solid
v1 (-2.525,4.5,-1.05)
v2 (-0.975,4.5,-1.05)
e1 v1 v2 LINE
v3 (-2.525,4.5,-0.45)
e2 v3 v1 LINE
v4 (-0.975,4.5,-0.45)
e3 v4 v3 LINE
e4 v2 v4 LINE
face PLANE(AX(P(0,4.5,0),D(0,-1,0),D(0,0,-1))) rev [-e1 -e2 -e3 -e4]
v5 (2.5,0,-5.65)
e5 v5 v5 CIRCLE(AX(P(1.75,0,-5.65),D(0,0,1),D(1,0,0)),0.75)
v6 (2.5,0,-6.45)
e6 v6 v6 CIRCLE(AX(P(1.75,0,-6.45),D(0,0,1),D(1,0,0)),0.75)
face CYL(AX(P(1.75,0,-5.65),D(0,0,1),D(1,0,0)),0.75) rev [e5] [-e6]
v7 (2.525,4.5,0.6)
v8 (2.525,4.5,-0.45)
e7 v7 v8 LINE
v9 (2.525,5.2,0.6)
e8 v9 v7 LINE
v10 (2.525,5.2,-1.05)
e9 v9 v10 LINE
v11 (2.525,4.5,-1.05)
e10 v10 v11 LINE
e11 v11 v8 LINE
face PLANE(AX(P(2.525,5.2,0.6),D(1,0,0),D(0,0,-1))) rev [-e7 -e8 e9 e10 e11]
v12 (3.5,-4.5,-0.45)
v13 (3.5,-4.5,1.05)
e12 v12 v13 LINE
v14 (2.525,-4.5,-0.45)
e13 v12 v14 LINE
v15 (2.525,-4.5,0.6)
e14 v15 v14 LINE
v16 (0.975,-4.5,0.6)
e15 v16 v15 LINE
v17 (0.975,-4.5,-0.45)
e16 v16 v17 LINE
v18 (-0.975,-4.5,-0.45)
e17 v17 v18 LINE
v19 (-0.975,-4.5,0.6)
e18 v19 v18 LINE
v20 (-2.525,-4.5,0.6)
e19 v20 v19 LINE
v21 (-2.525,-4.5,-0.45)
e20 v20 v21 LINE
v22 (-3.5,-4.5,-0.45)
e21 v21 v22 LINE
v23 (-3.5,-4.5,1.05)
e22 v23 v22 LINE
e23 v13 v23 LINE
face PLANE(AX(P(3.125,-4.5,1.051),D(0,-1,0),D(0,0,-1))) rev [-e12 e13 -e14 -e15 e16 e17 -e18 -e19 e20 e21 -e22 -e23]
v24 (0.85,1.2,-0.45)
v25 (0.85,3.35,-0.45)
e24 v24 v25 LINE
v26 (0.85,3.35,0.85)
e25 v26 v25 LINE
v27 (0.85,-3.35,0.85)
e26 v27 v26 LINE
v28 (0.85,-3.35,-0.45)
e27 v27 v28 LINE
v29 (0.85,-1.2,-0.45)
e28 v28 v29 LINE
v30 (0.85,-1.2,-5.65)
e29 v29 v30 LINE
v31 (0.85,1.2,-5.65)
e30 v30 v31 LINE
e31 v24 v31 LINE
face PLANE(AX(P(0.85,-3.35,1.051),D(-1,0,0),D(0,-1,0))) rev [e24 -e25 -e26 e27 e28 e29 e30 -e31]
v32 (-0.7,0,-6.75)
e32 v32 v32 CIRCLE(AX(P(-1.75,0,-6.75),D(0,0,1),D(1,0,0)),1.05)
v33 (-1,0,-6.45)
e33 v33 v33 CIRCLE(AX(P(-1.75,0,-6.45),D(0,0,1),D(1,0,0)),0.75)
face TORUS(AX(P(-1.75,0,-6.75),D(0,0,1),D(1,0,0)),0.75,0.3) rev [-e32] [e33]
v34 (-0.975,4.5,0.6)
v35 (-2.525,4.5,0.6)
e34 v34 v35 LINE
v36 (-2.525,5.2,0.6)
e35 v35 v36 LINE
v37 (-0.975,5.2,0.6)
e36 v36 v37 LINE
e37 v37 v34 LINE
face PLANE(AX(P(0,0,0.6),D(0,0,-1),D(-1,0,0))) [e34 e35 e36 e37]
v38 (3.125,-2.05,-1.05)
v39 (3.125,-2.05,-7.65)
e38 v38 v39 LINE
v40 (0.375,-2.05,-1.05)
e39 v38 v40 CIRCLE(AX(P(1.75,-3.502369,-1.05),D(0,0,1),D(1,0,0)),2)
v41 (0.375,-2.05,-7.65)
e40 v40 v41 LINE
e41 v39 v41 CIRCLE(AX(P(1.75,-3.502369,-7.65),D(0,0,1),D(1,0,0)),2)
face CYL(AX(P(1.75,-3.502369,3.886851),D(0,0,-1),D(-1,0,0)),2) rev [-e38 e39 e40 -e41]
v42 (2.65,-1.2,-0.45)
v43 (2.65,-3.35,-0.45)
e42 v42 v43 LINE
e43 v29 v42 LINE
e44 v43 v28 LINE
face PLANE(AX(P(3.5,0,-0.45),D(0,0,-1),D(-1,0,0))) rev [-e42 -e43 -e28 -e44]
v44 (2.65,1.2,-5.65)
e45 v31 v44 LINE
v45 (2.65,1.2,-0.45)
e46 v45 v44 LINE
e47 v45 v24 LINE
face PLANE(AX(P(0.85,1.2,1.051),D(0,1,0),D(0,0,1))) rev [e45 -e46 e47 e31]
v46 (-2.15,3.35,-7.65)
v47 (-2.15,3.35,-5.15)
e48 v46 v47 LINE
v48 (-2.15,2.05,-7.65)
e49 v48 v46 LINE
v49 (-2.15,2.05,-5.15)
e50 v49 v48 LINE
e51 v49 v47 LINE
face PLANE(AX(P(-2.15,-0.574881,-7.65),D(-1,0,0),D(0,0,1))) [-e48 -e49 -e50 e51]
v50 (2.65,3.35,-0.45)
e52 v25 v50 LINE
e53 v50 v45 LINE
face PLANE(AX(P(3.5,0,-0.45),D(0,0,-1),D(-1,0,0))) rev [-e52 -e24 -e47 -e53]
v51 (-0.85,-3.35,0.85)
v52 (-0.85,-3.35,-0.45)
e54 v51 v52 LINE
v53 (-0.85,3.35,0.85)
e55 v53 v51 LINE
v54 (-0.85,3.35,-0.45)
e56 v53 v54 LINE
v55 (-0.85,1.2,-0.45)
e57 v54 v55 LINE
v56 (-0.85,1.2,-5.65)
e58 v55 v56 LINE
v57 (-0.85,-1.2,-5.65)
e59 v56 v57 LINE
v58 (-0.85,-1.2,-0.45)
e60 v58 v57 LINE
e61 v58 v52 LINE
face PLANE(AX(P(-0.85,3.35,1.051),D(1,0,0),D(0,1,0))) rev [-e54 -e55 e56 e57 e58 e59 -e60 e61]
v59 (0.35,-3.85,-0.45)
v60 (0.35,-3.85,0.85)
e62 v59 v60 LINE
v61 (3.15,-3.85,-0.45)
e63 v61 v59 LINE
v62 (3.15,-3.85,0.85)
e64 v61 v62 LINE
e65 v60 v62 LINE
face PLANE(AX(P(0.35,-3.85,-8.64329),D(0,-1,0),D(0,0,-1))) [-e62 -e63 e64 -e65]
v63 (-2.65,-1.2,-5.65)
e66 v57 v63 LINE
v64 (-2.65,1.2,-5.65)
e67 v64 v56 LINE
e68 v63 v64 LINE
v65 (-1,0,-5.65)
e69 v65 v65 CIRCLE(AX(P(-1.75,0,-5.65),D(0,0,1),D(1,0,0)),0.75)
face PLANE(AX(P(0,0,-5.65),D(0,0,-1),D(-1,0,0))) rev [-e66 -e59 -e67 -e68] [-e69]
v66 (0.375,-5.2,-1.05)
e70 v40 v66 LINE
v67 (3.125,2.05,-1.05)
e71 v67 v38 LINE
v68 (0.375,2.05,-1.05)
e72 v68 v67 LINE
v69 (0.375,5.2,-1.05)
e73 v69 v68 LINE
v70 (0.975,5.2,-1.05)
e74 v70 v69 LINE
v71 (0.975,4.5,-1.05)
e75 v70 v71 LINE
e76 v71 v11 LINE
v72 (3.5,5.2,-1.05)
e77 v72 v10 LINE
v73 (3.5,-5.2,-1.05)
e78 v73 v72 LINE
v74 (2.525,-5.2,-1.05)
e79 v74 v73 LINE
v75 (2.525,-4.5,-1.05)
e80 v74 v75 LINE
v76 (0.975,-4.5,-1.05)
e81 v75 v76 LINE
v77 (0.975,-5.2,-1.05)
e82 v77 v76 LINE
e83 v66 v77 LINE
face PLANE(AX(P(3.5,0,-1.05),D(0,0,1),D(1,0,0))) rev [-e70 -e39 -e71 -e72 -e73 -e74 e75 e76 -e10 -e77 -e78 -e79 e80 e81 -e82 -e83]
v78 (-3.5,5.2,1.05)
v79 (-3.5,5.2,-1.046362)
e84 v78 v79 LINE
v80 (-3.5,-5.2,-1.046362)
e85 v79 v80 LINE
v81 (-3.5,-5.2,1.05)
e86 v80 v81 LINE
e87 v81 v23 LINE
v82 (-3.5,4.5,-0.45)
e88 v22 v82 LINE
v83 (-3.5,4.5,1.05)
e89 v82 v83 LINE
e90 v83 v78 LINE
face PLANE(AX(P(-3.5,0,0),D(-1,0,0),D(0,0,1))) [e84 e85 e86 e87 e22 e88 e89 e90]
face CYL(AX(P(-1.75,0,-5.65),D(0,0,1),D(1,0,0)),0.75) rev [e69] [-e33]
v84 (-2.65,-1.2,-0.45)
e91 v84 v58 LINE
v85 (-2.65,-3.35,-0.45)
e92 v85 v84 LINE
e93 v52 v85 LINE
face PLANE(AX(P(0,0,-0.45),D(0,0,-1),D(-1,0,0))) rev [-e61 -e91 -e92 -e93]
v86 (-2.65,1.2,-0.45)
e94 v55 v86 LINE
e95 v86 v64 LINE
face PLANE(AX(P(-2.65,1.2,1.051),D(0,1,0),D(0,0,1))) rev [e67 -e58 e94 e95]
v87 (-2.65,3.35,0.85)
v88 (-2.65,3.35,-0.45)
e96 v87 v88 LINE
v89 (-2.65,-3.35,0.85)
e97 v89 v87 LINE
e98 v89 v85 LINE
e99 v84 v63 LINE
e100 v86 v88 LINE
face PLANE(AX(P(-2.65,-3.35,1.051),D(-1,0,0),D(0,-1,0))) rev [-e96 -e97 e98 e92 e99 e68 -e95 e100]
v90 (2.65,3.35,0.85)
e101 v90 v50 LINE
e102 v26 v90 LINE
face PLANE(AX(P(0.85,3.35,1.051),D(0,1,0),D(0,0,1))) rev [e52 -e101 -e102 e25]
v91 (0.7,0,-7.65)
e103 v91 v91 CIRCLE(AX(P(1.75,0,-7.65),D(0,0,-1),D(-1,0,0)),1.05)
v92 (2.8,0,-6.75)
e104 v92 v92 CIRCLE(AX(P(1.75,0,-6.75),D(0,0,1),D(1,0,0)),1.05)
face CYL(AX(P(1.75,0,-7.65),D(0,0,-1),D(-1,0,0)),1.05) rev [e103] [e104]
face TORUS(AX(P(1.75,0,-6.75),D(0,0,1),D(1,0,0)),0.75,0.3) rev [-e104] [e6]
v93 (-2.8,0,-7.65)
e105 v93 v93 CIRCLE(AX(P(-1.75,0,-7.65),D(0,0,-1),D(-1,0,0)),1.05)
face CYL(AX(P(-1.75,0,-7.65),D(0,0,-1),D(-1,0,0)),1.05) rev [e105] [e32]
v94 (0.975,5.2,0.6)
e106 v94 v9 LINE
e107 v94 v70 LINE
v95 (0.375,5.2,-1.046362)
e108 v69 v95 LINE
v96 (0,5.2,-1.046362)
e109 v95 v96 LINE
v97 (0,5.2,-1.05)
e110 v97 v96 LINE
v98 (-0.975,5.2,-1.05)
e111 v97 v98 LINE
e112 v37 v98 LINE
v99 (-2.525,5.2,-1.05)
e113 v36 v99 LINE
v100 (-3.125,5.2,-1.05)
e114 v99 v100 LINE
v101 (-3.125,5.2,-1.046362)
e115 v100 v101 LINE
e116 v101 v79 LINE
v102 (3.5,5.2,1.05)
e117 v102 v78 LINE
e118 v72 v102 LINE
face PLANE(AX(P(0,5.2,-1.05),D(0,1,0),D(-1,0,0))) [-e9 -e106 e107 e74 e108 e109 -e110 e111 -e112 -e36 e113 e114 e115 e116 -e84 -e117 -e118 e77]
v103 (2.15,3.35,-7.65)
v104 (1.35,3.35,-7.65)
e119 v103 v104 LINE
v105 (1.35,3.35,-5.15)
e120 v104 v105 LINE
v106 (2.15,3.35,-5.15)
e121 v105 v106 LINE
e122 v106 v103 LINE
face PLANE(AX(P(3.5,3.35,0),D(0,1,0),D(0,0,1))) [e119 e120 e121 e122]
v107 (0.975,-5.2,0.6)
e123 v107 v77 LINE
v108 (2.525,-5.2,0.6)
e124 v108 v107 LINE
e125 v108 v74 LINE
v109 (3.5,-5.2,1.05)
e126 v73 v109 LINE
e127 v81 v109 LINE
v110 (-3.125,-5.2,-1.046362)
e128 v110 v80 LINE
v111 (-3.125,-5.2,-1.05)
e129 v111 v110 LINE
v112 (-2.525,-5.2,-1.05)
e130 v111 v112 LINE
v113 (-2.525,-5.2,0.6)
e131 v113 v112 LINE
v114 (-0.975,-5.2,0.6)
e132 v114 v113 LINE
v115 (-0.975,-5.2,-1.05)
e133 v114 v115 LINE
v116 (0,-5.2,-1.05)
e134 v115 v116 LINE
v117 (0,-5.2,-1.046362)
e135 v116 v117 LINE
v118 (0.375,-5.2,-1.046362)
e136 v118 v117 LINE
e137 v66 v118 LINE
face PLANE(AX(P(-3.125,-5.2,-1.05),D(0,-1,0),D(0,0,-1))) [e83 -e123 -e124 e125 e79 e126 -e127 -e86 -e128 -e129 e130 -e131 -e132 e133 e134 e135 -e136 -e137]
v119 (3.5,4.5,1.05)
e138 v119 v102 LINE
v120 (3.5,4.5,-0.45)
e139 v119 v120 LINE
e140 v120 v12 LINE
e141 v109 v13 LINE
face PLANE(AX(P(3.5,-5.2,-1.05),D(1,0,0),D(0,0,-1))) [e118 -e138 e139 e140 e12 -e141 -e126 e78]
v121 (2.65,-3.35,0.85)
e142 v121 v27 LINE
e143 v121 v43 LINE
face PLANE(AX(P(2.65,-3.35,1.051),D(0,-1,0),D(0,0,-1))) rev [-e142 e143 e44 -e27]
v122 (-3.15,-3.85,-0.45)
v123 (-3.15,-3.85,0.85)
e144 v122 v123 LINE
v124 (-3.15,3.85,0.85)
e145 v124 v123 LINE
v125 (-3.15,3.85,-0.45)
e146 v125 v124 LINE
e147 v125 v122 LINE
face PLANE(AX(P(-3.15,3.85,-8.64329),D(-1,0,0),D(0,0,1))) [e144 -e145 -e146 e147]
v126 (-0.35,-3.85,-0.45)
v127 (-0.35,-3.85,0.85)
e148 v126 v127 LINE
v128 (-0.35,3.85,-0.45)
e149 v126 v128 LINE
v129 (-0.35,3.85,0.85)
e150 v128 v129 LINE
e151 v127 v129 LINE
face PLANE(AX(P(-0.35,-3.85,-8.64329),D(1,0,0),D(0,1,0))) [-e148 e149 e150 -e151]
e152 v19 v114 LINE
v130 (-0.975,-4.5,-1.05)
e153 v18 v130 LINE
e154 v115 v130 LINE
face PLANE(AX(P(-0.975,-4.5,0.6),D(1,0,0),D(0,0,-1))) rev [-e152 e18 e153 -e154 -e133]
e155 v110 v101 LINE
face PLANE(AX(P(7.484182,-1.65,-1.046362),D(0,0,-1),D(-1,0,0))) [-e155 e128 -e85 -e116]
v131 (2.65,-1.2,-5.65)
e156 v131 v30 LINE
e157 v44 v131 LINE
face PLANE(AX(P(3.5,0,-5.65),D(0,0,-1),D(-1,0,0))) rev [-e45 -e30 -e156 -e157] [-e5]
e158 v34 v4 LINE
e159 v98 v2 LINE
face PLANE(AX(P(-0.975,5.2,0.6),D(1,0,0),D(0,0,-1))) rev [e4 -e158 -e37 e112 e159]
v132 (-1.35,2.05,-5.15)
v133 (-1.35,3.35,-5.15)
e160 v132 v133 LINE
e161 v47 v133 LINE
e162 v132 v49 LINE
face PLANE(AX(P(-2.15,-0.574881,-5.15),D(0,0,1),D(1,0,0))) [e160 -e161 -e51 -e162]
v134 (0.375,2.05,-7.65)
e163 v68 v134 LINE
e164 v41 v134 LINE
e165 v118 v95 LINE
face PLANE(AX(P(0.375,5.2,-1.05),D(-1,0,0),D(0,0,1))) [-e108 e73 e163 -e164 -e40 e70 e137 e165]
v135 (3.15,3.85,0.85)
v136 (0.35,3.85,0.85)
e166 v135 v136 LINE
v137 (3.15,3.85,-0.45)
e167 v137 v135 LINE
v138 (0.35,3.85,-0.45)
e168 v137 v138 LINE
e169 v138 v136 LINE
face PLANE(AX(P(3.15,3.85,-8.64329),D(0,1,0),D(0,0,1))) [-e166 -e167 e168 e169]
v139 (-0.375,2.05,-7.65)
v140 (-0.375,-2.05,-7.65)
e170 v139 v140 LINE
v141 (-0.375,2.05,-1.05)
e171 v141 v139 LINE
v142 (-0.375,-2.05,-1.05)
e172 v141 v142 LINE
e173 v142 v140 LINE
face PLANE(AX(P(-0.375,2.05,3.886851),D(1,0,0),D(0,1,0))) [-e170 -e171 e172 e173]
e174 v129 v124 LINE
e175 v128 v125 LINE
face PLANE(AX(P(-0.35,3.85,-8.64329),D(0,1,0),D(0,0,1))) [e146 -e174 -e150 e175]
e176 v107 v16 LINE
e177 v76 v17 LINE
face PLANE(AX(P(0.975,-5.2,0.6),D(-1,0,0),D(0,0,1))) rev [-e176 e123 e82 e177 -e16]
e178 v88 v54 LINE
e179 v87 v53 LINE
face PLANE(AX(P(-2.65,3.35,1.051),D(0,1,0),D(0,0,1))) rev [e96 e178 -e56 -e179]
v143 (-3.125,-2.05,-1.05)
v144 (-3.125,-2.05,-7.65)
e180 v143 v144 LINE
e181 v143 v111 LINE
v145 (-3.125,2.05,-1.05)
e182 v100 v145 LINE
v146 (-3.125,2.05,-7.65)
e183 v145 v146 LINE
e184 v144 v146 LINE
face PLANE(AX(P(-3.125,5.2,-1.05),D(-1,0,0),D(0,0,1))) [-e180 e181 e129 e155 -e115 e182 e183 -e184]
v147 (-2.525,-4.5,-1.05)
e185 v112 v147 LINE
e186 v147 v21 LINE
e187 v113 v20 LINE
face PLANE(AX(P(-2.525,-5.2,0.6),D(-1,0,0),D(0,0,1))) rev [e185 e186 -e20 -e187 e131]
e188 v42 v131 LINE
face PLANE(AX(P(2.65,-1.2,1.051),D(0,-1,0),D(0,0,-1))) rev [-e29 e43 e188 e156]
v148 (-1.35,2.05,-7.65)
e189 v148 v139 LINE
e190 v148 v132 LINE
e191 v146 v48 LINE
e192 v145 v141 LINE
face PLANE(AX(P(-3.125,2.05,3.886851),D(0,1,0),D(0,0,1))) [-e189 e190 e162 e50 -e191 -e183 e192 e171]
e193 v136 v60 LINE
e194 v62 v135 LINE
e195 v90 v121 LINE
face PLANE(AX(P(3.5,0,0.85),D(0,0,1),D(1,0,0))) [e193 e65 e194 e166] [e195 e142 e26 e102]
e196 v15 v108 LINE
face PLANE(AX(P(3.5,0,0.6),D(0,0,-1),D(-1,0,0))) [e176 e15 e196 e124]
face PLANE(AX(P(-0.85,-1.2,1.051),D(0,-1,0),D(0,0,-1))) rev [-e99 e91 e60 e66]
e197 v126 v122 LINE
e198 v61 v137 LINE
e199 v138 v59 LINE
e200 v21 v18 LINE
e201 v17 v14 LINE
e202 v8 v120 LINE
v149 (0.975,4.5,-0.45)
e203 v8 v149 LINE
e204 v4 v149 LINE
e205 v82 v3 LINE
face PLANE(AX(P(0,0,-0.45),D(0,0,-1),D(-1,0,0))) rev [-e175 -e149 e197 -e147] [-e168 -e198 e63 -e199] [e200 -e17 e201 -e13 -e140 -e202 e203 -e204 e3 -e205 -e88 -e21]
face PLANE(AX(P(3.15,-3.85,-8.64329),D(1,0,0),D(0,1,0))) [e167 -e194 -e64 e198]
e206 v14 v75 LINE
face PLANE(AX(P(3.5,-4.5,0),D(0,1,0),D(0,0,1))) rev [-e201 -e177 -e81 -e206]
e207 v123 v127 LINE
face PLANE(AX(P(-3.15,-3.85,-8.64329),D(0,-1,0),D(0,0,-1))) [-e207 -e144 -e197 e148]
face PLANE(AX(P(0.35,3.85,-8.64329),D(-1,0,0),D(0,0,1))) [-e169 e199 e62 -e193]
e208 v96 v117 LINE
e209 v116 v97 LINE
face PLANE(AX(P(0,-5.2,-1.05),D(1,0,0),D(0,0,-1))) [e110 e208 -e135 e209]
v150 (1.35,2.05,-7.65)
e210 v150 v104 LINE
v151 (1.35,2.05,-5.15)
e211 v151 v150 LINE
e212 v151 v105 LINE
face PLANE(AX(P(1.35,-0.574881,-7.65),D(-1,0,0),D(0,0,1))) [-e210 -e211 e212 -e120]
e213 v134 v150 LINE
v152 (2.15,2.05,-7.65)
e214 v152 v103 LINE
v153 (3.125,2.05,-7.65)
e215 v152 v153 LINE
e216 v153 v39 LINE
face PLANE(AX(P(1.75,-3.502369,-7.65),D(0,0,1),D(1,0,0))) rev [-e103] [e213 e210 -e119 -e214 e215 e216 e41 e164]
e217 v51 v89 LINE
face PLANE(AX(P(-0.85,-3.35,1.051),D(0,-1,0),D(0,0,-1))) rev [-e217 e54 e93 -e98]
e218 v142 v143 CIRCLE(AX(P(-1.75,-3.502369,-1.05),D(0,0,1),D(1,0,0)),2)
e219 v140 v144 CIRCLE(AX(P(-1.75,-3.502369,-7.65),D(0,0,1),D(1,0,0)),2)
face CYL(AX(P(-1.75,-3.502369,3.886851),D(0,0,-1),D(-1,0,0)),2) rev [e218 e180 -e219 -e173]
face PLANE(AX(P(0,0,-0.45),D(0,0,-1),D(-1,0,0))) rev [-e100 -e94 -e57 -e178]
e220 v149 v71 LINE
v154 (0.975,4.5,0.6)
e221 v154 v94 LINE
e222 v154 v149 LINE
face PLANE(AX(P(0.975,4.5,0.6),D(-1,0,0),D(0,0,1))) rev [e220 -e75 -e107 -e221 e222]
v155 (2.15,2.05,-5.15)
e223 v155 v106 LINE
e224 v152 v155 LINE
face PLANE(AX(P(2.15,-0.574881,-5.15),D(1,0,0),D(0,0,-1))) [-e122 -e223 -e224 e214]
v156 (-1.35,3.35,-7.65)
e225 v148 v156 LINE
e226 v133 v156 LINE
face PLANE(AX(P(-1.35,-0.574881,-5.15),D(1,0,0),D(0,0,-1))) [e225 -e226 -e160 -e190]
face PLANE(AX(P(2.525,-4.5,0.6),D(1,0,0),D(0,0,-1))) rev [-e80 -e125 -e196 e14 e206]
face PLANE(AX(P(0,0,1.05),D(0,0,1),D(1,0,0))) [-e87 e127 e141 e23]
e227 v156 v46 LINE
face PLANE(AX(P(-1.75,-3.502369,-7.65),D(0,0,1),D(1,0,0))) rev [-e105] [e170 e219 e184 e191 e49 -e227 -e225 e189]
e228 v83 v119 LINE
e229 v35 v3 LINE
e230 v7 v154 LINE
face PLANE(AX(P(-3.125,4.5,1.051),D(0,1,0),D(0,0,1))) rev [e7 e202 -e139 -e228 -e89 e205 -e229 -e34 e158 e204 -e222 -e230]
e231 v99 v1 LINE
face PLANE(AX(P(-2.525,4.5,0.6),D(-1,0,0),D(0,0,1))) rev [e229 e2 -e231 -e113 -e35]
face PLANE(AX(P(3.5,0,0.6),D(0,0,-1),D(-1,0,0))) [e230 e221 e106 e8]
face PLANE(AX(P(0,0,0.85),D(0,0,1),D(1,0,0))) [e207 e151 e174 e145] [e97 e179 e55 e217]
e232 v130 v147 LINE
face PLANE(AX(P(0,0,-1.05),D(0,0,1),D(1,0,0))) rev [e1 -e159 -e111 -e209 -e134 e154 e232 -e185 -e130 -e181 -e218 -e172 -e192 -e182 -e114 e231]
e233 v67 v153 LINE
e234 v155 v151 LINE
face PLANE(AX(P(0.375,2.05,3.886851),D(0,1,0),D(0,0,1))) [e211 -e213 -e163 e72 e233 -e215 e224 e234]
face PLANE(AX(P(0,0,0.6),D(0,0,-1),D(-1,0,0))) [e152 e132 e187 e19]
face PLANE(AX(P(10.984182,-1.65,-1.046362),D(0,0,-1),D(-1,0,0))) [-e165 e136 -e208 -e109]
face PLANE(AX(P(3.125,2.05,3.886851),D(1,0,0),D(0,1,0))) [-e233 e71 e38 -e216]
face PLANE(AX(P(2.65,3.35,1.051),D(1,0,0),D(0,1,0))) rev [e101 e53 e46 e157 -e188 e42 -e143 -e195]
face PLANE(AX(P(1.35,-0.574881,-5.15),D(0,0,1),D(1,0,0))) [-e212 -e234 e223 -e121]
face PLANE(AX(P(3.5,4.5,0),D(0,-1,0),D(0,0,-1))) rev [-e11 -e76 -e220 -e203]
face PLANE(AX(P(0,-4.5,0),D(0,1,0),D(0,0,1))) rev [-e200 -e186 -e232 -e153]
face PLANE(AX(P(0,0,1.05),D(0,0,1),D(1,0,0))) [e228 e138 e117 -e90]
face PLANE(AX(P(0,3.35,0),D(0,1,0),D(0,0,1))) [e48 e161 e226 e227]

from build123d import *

# Parameters (mm, degrees)
SKETCH_1_W                     = 3.125
SKETCH_1_H                     = 10.4
EXTRUDE_1_DEPTH                = 2.1
CUT_EXTRUDE_1_REACH            = 8.249
SKETCH_2_W                     = 6.25
SKETCH_2_H                     = 9
SKETCH_3_W                     = 1.55
SKETCH_3_H                     = 0.7
CUT_EXTRUDE_2_DEPTH            = 1.05
SKETCH_5_W                     = 1.55
SKETCH_5_H                     = 0.7
CUT_EXTRUDE_4_DEPTH            = 1.05
EXTRUDE_3_DEPTH                = 6.6
SKETCH_9_W                     = 2.8
SKETCH_9_H                     = 7.7
EXTRUDE_4_DEPTH                = 1.3
CUT_EXTRUDE_6_REACH            = 11.424
SKETCH_11_W                    = 1.8
SKETCH_11_H                    = 6.7
CUT_EXTRUDE_9_REACH            = 11.047
SKETCH_14_W                    = 1.8
SKETCH_14_H                    = 2.4
CUT_EXTRUDE_11_REACH           = 14.749
SKETCH_16_W                    = 1.55
SKETCH_16_H                    = 0.6
CUT_EXTRUDE_12_REACH           = 14.749
SKETCH_17_W                    = 1.55
SKETCH_17_H                    = 0.6
EXTRUDE_6_DEPTH                = 0.375
SKETCH_21_W                    = 0.8
SKETCH_21_H                    = 2.5
EXTRUDE_8_DEPTH                = 1.3
HOLE_WIZARD_2_1_2_1_2_D        = 2.1
HOLE_WIZARD_2_1_2_1_2_DEPTH    = 1.2
HOLE_WIZARD_1_5_1_5_1_D        = 1.5
HOLE_WIZARD_1_5_1_5_1_DEPTH    = 2.000025
FILLET_1_R                     = 0.3
PATTERN_LINEAR_1_COUNT         = 2
PATTERN_LINEAR_1_PITCH         = 3.5
FILLET_1_OF_PATTERN_LINEAR_1_R = 0.3


with BuildPart() as part:
    # Эскиз1 → Бобышка-Вытянуть1 (new body)
    with BuildSketch(Plane.XY.offset(1.05)):
        with Locations((-1.5625, 0)):
            Rectangle(SKETCH_1_W, SKETCH_1_H)
    extrude_1 = extrude(amount=-EXTRUDE_1_DEPTH)

    # Эскиз2 → Вырез-Вытянуть1 (cut, up to next)
    with BuildSketch(Plane(origin=(0, 0, -0.45), x_dir=(-1, 0, 0), z_dir=(0, 0, -1)), mode=Mode.PRIVATE) as cut_extrude_1_sk1:
        Rectangle(SKETCH_2_W, SKETCH_2_H)
    cut_extrude_1_tool1 = extrude(cut_extrude_1_sk1.sketch, amount=-CUT_EXTRUDE_1_REACH, mode=Mode.PRIVATE) & part.part
    cut_extrude_1 = cut_extrude_1_tool1.solids().sort_by_distance((0, 0, -0.45))[0]
    add(cut_extrude_1, mode=Mode.SUBTRACT)

    # Эскиз3 → Вырез-Вытянуть2 (cut)
    with BuildSketch(Plane(origin=(0, 0, -0.45), x_dir=(-1, 0, 0), z_dir=(0, 0, -1))):
        with Locations((1.75, 4.85)):
            Rectangle(SKETCH_3_W, SKETCH_3_H)
    cut_extrude_2 = extrude(amount=-CUT_EXTRUDE_2_DEPTH, mode=Mode.SUBTRACT)

    # Эскиз5 → Вырез-Вытянуть4 (cut)
    with BuildSketch(Plane(origin=(0, 0, -0.45), x_dir=(-1, 0, 0), z_dir=(0, 0, -1))):
        with Locations((1.75, -4.85)):
            Rectangle(SKETCH_5_W, SKETCH_5_H)
    cut_extrude_4 = extrude(amount=-CUT_EXTRUDE_4_DEPTH, mode=Mode.SUBTRACT)

    # Эскиз8 → Бобышка-Вытянуть3 (add)
    with BuildSketch(Plane(origin=(0, 0, -7.65), x_dir=(-1, 0, 0), z_dir=(0, 0, -1))):
        with BuildLine():
            Line((3.125, 2.05), (0.375, 2.05))
            Line((0.375, 2.05), (0.375, -2.05))
            ThreePointArc((0.375, -2.05), (1.75, -1.502368755), (3.125, -2.05))
            Line((3.125, -2.05), (3.125, 2.05))
        make_face()
    extrude_3 = extrude(amount=-EXTRUDE_3_DEPTH)

    # Эскиз9 → Бобышка-Вытянуть4 (add)
    with BuildSketch(Plane.XY.offset(0.85)):
        with Locations((-1.75, 0)):
            Rectangle(SKETCH_9_W, SKETCH_9_H)
    extrude_4 = extrude(amount=-EXTRUDE_4_DEPTH)

    # Эскиз11 → Вырез-Вытянуть6 (cut, up to next)
    with BuildSketch(Plane(origin=(0, 0, -0.45), x_dir=(-1, 0, 0), z_dir=(0, 0, -1)), mode=Mode.PRIVATE) as cut_extrude_6_sk1:
        with Locations((1.75, 0)):
            Rectangle(SKETCH_11_W, SKETCH_11_H)
    cut_extrude_6_tool1 = extrude(cut_extrude_6_sk1.sketch, amount=-CUT_EXTRUDE_6_REACH, mode=Mode.PRIVATE) & part.part
    cut_extrude_6 = cut_extrude_6_tool1.solids().sort_by_distance((-1.75, 0, -0.45))[0]
    add(cut_extrude_6, mode=Mode.SUBTRACT)

    # Эскиз14 → Вырез-Вытянуть9 (cut, up to next)
    with BuildSketch(Plane(origin=(0, 0, -5.65), x_dir=(-1, 0, 0), z_dir=(0, 0, -1)), mode=Mode.PRIVATE) as cut_extrude_9_sk1:
        with Locations((1.75, 0)):
            Rectangle(SKETCH_14_W, SKETCH_14_H)
    cut_extrude_9_tool1 = extrude(cut_extrude_9_sk1.sketch, amount=-CUT_EXTRUDE_9_REACH, mode=Mode.PRIVATE) & part.part
    cut_extrude_9 = cut_extrude_9_tool1.solids().sort_by_distance((-1.75, 0, -5.65))[0]
    add(cut_extrude_9, mode=Mode.SUBTRACT)

    # Эскиз16 → Вырез-Вытянуть11 (cut, up to next)
    with BuildSketch(Plane(origin=(0, -4.5, 0), x_dir=(1, 0, 0), z_dir=(0, 1, 0)), mode=Mode.PRIVATE) as cut_extrude_11_sk1:
        with Locations((-1.75, 0.75)):
            Rectangle(SKETCH_16_W, SKETCH_16_H)
    cut_extrude_11_tool1 = extrude(cut_extrude_11_sk1.sketch, amount=-CUT_EXTRUDE_11_REACH, mode=Mode.PRIVATE) & part.part
    cut_extrude_11 = cut_extrude_11_tool1.solids().sort_by_distance((-1.75, -4.5, -0.75))[0]
    add(cut_extrude_11, mode=Mode.SUBTRACT)

    # Эскиз17 → Вырез-Вытянуть12 (cut, up to next)
    with BuildSketch(Plane.XZ.offset(-4.5), mode=Mode.PRIVATE) as cut_extrude_12_sk1:
        with Locations((-1.75, -0.75)):
            Rectangle(SKETCH_17_W, SKETCH_17_H)
    cut_extrude_12_tool1 = extrude(cut_extrude_12_sk1.sketch, amount=-CUT_EXTRUDE_12_REACH, mode=Mode.PRIVATE) & part.part
    cut_extrude_12 = cut_extrude_12_tool1.solids().sort_by_distance((-1.75, 4.5, -0.75))[0]
    add(cut_extrude_12, mode=Mode.SUBTRACT)

    # Эскиз19 → Бобышка-Вытянуть6 (add)
    with BuildSketch(Plane(origin=(-3.5, 0, 0), x_dir=(0, -1, 0), z_dir=(-1, 0, 0))):
        Polygon((1.65, -1.046361901), (5.2, -1.046361901), (5.2, 1.05), (4.5, 1.05), (4.5, -0.45), (-4.5, -0.45), (-4.5, 1.05), (-5.2, 1.05), (-5.2, -1.046361901), align=None)
    extrude_6 = extrude(amount=-EXTRUDE_6_DEPTH)

    # Эскиз21 → Бобышка-Вытянуть8 (add)
    with BuildSketch(Plane(origin=(0, 3.35, 0), x_dir=(1, 0, 0), z_dir=(0, 1, 0))):
        with Locations((-1.75, 6.4)):
            Rectangle(SKETCH_21_W, SKETCH_21_H)
    extrude_8 = extrude(amount=-EXTRUDE_8_DEPTH)

    # Диаметр отверстия Ø2.1 (2.1)2
    with Locations(Plane(origin=(0, 0, -7.65), x_dir=(-1, 0, 0), z_dir=(0, 0, -1))):
        with Locations((1.75, 0)):
            hole_wizard_2_1_2_1_2 = Hole(HOLE_WIZARD_2_1_2_1_2_D / 2, depth=HOLE_WIZARD_2_1_2_1_2_DEPTH)

    # Диаметр отверстия Ø1.5 (1.5)1
    with Locations(Plane.XY.offset(-5.65)):
        with Locations((-1.75, 0)):
            hole_wizard_1_5_1_5_1 = Hole(HOLE_WIZARD_1_5_1_5_1_D / 2, depth=HOLE_WIZARD_1_5_1_5_1_DEPTH)

    # Скругление1
    fillet_1_edges = [part.edges().sort_by_distance(p)[0] for p in [
        (-2.8, 0, -6.45),
    ]]
    fillet(fillet_1_edges, radius=FILLET_1_R - 0.0001)  # a hair under: the kernel refuses the full size

    # Линейный массив1: Бобышка-Вытянуть1, Вырез-Вытянуть1, Вырез-Вытянуть2, Вырез-Вытянуть4, Бобышка-Вытянуть3, Бобышка-Вытянуть4, Вырез-Вытянуть6, Вырез-Вытянуть9, Вырез-Вытянуть11, Вырез-Вытянуть12, Бобышка-Вытянуть6, Бобышка-Вытянуть8, Диаметр отверстия Ø2.1 (2.1)2, Диаметр отверстия Ø1.5 (1.5)1 ×2
    with Locations(*[(i * PATTERN_LINEAR_1_PITCH, 0, 0) for i in range(1, PATTERN_LINEAR_1_COUNT)]):
        add(extrude_1)
        add(cut_extrude_1, mode=Mode.SUBTRACT)
        add(cut_extrude_2, mode=Mode.SUBTRACT)
        add(cut_extrude_4, mode=Mode.SUBTRACT)
        add(extrude_3)
        add(extrude_4)
        add(cut_extrude_6, mode=Mode.SUBTRACT)
        add(cut_extrude_9, mode=Mode.SUBTRACT)
        add(cut_extrude_11, mode=Mode.SUBTRACT)
        add(cut_extrude_12, mode=Mode.SUBTRACT)
        add(extrude_6)
        add(extrude_8)
        add(hole_wizard_2_1_2_1_2, mode=Mode.SUBTRACT)
        add(hole_wizard_1_5_1_5_1, mode=Mode.SUBTRACT)

    # Скругление1 of Линейный массив1
    fillet_1_of_pattern_linear_1_edges = [part.edges().sort_by_distance(p)[0] for p in [
        (0.7, 0, -6.45),
    ]]
    fillet(fillet_1_of_pattern_linear_1_edges, radius=FILLET_1_OF_PATTERN_LINEAR_1_R - 0.0001)  # a hair under: the kernel refuses the full size


solid = part.part
